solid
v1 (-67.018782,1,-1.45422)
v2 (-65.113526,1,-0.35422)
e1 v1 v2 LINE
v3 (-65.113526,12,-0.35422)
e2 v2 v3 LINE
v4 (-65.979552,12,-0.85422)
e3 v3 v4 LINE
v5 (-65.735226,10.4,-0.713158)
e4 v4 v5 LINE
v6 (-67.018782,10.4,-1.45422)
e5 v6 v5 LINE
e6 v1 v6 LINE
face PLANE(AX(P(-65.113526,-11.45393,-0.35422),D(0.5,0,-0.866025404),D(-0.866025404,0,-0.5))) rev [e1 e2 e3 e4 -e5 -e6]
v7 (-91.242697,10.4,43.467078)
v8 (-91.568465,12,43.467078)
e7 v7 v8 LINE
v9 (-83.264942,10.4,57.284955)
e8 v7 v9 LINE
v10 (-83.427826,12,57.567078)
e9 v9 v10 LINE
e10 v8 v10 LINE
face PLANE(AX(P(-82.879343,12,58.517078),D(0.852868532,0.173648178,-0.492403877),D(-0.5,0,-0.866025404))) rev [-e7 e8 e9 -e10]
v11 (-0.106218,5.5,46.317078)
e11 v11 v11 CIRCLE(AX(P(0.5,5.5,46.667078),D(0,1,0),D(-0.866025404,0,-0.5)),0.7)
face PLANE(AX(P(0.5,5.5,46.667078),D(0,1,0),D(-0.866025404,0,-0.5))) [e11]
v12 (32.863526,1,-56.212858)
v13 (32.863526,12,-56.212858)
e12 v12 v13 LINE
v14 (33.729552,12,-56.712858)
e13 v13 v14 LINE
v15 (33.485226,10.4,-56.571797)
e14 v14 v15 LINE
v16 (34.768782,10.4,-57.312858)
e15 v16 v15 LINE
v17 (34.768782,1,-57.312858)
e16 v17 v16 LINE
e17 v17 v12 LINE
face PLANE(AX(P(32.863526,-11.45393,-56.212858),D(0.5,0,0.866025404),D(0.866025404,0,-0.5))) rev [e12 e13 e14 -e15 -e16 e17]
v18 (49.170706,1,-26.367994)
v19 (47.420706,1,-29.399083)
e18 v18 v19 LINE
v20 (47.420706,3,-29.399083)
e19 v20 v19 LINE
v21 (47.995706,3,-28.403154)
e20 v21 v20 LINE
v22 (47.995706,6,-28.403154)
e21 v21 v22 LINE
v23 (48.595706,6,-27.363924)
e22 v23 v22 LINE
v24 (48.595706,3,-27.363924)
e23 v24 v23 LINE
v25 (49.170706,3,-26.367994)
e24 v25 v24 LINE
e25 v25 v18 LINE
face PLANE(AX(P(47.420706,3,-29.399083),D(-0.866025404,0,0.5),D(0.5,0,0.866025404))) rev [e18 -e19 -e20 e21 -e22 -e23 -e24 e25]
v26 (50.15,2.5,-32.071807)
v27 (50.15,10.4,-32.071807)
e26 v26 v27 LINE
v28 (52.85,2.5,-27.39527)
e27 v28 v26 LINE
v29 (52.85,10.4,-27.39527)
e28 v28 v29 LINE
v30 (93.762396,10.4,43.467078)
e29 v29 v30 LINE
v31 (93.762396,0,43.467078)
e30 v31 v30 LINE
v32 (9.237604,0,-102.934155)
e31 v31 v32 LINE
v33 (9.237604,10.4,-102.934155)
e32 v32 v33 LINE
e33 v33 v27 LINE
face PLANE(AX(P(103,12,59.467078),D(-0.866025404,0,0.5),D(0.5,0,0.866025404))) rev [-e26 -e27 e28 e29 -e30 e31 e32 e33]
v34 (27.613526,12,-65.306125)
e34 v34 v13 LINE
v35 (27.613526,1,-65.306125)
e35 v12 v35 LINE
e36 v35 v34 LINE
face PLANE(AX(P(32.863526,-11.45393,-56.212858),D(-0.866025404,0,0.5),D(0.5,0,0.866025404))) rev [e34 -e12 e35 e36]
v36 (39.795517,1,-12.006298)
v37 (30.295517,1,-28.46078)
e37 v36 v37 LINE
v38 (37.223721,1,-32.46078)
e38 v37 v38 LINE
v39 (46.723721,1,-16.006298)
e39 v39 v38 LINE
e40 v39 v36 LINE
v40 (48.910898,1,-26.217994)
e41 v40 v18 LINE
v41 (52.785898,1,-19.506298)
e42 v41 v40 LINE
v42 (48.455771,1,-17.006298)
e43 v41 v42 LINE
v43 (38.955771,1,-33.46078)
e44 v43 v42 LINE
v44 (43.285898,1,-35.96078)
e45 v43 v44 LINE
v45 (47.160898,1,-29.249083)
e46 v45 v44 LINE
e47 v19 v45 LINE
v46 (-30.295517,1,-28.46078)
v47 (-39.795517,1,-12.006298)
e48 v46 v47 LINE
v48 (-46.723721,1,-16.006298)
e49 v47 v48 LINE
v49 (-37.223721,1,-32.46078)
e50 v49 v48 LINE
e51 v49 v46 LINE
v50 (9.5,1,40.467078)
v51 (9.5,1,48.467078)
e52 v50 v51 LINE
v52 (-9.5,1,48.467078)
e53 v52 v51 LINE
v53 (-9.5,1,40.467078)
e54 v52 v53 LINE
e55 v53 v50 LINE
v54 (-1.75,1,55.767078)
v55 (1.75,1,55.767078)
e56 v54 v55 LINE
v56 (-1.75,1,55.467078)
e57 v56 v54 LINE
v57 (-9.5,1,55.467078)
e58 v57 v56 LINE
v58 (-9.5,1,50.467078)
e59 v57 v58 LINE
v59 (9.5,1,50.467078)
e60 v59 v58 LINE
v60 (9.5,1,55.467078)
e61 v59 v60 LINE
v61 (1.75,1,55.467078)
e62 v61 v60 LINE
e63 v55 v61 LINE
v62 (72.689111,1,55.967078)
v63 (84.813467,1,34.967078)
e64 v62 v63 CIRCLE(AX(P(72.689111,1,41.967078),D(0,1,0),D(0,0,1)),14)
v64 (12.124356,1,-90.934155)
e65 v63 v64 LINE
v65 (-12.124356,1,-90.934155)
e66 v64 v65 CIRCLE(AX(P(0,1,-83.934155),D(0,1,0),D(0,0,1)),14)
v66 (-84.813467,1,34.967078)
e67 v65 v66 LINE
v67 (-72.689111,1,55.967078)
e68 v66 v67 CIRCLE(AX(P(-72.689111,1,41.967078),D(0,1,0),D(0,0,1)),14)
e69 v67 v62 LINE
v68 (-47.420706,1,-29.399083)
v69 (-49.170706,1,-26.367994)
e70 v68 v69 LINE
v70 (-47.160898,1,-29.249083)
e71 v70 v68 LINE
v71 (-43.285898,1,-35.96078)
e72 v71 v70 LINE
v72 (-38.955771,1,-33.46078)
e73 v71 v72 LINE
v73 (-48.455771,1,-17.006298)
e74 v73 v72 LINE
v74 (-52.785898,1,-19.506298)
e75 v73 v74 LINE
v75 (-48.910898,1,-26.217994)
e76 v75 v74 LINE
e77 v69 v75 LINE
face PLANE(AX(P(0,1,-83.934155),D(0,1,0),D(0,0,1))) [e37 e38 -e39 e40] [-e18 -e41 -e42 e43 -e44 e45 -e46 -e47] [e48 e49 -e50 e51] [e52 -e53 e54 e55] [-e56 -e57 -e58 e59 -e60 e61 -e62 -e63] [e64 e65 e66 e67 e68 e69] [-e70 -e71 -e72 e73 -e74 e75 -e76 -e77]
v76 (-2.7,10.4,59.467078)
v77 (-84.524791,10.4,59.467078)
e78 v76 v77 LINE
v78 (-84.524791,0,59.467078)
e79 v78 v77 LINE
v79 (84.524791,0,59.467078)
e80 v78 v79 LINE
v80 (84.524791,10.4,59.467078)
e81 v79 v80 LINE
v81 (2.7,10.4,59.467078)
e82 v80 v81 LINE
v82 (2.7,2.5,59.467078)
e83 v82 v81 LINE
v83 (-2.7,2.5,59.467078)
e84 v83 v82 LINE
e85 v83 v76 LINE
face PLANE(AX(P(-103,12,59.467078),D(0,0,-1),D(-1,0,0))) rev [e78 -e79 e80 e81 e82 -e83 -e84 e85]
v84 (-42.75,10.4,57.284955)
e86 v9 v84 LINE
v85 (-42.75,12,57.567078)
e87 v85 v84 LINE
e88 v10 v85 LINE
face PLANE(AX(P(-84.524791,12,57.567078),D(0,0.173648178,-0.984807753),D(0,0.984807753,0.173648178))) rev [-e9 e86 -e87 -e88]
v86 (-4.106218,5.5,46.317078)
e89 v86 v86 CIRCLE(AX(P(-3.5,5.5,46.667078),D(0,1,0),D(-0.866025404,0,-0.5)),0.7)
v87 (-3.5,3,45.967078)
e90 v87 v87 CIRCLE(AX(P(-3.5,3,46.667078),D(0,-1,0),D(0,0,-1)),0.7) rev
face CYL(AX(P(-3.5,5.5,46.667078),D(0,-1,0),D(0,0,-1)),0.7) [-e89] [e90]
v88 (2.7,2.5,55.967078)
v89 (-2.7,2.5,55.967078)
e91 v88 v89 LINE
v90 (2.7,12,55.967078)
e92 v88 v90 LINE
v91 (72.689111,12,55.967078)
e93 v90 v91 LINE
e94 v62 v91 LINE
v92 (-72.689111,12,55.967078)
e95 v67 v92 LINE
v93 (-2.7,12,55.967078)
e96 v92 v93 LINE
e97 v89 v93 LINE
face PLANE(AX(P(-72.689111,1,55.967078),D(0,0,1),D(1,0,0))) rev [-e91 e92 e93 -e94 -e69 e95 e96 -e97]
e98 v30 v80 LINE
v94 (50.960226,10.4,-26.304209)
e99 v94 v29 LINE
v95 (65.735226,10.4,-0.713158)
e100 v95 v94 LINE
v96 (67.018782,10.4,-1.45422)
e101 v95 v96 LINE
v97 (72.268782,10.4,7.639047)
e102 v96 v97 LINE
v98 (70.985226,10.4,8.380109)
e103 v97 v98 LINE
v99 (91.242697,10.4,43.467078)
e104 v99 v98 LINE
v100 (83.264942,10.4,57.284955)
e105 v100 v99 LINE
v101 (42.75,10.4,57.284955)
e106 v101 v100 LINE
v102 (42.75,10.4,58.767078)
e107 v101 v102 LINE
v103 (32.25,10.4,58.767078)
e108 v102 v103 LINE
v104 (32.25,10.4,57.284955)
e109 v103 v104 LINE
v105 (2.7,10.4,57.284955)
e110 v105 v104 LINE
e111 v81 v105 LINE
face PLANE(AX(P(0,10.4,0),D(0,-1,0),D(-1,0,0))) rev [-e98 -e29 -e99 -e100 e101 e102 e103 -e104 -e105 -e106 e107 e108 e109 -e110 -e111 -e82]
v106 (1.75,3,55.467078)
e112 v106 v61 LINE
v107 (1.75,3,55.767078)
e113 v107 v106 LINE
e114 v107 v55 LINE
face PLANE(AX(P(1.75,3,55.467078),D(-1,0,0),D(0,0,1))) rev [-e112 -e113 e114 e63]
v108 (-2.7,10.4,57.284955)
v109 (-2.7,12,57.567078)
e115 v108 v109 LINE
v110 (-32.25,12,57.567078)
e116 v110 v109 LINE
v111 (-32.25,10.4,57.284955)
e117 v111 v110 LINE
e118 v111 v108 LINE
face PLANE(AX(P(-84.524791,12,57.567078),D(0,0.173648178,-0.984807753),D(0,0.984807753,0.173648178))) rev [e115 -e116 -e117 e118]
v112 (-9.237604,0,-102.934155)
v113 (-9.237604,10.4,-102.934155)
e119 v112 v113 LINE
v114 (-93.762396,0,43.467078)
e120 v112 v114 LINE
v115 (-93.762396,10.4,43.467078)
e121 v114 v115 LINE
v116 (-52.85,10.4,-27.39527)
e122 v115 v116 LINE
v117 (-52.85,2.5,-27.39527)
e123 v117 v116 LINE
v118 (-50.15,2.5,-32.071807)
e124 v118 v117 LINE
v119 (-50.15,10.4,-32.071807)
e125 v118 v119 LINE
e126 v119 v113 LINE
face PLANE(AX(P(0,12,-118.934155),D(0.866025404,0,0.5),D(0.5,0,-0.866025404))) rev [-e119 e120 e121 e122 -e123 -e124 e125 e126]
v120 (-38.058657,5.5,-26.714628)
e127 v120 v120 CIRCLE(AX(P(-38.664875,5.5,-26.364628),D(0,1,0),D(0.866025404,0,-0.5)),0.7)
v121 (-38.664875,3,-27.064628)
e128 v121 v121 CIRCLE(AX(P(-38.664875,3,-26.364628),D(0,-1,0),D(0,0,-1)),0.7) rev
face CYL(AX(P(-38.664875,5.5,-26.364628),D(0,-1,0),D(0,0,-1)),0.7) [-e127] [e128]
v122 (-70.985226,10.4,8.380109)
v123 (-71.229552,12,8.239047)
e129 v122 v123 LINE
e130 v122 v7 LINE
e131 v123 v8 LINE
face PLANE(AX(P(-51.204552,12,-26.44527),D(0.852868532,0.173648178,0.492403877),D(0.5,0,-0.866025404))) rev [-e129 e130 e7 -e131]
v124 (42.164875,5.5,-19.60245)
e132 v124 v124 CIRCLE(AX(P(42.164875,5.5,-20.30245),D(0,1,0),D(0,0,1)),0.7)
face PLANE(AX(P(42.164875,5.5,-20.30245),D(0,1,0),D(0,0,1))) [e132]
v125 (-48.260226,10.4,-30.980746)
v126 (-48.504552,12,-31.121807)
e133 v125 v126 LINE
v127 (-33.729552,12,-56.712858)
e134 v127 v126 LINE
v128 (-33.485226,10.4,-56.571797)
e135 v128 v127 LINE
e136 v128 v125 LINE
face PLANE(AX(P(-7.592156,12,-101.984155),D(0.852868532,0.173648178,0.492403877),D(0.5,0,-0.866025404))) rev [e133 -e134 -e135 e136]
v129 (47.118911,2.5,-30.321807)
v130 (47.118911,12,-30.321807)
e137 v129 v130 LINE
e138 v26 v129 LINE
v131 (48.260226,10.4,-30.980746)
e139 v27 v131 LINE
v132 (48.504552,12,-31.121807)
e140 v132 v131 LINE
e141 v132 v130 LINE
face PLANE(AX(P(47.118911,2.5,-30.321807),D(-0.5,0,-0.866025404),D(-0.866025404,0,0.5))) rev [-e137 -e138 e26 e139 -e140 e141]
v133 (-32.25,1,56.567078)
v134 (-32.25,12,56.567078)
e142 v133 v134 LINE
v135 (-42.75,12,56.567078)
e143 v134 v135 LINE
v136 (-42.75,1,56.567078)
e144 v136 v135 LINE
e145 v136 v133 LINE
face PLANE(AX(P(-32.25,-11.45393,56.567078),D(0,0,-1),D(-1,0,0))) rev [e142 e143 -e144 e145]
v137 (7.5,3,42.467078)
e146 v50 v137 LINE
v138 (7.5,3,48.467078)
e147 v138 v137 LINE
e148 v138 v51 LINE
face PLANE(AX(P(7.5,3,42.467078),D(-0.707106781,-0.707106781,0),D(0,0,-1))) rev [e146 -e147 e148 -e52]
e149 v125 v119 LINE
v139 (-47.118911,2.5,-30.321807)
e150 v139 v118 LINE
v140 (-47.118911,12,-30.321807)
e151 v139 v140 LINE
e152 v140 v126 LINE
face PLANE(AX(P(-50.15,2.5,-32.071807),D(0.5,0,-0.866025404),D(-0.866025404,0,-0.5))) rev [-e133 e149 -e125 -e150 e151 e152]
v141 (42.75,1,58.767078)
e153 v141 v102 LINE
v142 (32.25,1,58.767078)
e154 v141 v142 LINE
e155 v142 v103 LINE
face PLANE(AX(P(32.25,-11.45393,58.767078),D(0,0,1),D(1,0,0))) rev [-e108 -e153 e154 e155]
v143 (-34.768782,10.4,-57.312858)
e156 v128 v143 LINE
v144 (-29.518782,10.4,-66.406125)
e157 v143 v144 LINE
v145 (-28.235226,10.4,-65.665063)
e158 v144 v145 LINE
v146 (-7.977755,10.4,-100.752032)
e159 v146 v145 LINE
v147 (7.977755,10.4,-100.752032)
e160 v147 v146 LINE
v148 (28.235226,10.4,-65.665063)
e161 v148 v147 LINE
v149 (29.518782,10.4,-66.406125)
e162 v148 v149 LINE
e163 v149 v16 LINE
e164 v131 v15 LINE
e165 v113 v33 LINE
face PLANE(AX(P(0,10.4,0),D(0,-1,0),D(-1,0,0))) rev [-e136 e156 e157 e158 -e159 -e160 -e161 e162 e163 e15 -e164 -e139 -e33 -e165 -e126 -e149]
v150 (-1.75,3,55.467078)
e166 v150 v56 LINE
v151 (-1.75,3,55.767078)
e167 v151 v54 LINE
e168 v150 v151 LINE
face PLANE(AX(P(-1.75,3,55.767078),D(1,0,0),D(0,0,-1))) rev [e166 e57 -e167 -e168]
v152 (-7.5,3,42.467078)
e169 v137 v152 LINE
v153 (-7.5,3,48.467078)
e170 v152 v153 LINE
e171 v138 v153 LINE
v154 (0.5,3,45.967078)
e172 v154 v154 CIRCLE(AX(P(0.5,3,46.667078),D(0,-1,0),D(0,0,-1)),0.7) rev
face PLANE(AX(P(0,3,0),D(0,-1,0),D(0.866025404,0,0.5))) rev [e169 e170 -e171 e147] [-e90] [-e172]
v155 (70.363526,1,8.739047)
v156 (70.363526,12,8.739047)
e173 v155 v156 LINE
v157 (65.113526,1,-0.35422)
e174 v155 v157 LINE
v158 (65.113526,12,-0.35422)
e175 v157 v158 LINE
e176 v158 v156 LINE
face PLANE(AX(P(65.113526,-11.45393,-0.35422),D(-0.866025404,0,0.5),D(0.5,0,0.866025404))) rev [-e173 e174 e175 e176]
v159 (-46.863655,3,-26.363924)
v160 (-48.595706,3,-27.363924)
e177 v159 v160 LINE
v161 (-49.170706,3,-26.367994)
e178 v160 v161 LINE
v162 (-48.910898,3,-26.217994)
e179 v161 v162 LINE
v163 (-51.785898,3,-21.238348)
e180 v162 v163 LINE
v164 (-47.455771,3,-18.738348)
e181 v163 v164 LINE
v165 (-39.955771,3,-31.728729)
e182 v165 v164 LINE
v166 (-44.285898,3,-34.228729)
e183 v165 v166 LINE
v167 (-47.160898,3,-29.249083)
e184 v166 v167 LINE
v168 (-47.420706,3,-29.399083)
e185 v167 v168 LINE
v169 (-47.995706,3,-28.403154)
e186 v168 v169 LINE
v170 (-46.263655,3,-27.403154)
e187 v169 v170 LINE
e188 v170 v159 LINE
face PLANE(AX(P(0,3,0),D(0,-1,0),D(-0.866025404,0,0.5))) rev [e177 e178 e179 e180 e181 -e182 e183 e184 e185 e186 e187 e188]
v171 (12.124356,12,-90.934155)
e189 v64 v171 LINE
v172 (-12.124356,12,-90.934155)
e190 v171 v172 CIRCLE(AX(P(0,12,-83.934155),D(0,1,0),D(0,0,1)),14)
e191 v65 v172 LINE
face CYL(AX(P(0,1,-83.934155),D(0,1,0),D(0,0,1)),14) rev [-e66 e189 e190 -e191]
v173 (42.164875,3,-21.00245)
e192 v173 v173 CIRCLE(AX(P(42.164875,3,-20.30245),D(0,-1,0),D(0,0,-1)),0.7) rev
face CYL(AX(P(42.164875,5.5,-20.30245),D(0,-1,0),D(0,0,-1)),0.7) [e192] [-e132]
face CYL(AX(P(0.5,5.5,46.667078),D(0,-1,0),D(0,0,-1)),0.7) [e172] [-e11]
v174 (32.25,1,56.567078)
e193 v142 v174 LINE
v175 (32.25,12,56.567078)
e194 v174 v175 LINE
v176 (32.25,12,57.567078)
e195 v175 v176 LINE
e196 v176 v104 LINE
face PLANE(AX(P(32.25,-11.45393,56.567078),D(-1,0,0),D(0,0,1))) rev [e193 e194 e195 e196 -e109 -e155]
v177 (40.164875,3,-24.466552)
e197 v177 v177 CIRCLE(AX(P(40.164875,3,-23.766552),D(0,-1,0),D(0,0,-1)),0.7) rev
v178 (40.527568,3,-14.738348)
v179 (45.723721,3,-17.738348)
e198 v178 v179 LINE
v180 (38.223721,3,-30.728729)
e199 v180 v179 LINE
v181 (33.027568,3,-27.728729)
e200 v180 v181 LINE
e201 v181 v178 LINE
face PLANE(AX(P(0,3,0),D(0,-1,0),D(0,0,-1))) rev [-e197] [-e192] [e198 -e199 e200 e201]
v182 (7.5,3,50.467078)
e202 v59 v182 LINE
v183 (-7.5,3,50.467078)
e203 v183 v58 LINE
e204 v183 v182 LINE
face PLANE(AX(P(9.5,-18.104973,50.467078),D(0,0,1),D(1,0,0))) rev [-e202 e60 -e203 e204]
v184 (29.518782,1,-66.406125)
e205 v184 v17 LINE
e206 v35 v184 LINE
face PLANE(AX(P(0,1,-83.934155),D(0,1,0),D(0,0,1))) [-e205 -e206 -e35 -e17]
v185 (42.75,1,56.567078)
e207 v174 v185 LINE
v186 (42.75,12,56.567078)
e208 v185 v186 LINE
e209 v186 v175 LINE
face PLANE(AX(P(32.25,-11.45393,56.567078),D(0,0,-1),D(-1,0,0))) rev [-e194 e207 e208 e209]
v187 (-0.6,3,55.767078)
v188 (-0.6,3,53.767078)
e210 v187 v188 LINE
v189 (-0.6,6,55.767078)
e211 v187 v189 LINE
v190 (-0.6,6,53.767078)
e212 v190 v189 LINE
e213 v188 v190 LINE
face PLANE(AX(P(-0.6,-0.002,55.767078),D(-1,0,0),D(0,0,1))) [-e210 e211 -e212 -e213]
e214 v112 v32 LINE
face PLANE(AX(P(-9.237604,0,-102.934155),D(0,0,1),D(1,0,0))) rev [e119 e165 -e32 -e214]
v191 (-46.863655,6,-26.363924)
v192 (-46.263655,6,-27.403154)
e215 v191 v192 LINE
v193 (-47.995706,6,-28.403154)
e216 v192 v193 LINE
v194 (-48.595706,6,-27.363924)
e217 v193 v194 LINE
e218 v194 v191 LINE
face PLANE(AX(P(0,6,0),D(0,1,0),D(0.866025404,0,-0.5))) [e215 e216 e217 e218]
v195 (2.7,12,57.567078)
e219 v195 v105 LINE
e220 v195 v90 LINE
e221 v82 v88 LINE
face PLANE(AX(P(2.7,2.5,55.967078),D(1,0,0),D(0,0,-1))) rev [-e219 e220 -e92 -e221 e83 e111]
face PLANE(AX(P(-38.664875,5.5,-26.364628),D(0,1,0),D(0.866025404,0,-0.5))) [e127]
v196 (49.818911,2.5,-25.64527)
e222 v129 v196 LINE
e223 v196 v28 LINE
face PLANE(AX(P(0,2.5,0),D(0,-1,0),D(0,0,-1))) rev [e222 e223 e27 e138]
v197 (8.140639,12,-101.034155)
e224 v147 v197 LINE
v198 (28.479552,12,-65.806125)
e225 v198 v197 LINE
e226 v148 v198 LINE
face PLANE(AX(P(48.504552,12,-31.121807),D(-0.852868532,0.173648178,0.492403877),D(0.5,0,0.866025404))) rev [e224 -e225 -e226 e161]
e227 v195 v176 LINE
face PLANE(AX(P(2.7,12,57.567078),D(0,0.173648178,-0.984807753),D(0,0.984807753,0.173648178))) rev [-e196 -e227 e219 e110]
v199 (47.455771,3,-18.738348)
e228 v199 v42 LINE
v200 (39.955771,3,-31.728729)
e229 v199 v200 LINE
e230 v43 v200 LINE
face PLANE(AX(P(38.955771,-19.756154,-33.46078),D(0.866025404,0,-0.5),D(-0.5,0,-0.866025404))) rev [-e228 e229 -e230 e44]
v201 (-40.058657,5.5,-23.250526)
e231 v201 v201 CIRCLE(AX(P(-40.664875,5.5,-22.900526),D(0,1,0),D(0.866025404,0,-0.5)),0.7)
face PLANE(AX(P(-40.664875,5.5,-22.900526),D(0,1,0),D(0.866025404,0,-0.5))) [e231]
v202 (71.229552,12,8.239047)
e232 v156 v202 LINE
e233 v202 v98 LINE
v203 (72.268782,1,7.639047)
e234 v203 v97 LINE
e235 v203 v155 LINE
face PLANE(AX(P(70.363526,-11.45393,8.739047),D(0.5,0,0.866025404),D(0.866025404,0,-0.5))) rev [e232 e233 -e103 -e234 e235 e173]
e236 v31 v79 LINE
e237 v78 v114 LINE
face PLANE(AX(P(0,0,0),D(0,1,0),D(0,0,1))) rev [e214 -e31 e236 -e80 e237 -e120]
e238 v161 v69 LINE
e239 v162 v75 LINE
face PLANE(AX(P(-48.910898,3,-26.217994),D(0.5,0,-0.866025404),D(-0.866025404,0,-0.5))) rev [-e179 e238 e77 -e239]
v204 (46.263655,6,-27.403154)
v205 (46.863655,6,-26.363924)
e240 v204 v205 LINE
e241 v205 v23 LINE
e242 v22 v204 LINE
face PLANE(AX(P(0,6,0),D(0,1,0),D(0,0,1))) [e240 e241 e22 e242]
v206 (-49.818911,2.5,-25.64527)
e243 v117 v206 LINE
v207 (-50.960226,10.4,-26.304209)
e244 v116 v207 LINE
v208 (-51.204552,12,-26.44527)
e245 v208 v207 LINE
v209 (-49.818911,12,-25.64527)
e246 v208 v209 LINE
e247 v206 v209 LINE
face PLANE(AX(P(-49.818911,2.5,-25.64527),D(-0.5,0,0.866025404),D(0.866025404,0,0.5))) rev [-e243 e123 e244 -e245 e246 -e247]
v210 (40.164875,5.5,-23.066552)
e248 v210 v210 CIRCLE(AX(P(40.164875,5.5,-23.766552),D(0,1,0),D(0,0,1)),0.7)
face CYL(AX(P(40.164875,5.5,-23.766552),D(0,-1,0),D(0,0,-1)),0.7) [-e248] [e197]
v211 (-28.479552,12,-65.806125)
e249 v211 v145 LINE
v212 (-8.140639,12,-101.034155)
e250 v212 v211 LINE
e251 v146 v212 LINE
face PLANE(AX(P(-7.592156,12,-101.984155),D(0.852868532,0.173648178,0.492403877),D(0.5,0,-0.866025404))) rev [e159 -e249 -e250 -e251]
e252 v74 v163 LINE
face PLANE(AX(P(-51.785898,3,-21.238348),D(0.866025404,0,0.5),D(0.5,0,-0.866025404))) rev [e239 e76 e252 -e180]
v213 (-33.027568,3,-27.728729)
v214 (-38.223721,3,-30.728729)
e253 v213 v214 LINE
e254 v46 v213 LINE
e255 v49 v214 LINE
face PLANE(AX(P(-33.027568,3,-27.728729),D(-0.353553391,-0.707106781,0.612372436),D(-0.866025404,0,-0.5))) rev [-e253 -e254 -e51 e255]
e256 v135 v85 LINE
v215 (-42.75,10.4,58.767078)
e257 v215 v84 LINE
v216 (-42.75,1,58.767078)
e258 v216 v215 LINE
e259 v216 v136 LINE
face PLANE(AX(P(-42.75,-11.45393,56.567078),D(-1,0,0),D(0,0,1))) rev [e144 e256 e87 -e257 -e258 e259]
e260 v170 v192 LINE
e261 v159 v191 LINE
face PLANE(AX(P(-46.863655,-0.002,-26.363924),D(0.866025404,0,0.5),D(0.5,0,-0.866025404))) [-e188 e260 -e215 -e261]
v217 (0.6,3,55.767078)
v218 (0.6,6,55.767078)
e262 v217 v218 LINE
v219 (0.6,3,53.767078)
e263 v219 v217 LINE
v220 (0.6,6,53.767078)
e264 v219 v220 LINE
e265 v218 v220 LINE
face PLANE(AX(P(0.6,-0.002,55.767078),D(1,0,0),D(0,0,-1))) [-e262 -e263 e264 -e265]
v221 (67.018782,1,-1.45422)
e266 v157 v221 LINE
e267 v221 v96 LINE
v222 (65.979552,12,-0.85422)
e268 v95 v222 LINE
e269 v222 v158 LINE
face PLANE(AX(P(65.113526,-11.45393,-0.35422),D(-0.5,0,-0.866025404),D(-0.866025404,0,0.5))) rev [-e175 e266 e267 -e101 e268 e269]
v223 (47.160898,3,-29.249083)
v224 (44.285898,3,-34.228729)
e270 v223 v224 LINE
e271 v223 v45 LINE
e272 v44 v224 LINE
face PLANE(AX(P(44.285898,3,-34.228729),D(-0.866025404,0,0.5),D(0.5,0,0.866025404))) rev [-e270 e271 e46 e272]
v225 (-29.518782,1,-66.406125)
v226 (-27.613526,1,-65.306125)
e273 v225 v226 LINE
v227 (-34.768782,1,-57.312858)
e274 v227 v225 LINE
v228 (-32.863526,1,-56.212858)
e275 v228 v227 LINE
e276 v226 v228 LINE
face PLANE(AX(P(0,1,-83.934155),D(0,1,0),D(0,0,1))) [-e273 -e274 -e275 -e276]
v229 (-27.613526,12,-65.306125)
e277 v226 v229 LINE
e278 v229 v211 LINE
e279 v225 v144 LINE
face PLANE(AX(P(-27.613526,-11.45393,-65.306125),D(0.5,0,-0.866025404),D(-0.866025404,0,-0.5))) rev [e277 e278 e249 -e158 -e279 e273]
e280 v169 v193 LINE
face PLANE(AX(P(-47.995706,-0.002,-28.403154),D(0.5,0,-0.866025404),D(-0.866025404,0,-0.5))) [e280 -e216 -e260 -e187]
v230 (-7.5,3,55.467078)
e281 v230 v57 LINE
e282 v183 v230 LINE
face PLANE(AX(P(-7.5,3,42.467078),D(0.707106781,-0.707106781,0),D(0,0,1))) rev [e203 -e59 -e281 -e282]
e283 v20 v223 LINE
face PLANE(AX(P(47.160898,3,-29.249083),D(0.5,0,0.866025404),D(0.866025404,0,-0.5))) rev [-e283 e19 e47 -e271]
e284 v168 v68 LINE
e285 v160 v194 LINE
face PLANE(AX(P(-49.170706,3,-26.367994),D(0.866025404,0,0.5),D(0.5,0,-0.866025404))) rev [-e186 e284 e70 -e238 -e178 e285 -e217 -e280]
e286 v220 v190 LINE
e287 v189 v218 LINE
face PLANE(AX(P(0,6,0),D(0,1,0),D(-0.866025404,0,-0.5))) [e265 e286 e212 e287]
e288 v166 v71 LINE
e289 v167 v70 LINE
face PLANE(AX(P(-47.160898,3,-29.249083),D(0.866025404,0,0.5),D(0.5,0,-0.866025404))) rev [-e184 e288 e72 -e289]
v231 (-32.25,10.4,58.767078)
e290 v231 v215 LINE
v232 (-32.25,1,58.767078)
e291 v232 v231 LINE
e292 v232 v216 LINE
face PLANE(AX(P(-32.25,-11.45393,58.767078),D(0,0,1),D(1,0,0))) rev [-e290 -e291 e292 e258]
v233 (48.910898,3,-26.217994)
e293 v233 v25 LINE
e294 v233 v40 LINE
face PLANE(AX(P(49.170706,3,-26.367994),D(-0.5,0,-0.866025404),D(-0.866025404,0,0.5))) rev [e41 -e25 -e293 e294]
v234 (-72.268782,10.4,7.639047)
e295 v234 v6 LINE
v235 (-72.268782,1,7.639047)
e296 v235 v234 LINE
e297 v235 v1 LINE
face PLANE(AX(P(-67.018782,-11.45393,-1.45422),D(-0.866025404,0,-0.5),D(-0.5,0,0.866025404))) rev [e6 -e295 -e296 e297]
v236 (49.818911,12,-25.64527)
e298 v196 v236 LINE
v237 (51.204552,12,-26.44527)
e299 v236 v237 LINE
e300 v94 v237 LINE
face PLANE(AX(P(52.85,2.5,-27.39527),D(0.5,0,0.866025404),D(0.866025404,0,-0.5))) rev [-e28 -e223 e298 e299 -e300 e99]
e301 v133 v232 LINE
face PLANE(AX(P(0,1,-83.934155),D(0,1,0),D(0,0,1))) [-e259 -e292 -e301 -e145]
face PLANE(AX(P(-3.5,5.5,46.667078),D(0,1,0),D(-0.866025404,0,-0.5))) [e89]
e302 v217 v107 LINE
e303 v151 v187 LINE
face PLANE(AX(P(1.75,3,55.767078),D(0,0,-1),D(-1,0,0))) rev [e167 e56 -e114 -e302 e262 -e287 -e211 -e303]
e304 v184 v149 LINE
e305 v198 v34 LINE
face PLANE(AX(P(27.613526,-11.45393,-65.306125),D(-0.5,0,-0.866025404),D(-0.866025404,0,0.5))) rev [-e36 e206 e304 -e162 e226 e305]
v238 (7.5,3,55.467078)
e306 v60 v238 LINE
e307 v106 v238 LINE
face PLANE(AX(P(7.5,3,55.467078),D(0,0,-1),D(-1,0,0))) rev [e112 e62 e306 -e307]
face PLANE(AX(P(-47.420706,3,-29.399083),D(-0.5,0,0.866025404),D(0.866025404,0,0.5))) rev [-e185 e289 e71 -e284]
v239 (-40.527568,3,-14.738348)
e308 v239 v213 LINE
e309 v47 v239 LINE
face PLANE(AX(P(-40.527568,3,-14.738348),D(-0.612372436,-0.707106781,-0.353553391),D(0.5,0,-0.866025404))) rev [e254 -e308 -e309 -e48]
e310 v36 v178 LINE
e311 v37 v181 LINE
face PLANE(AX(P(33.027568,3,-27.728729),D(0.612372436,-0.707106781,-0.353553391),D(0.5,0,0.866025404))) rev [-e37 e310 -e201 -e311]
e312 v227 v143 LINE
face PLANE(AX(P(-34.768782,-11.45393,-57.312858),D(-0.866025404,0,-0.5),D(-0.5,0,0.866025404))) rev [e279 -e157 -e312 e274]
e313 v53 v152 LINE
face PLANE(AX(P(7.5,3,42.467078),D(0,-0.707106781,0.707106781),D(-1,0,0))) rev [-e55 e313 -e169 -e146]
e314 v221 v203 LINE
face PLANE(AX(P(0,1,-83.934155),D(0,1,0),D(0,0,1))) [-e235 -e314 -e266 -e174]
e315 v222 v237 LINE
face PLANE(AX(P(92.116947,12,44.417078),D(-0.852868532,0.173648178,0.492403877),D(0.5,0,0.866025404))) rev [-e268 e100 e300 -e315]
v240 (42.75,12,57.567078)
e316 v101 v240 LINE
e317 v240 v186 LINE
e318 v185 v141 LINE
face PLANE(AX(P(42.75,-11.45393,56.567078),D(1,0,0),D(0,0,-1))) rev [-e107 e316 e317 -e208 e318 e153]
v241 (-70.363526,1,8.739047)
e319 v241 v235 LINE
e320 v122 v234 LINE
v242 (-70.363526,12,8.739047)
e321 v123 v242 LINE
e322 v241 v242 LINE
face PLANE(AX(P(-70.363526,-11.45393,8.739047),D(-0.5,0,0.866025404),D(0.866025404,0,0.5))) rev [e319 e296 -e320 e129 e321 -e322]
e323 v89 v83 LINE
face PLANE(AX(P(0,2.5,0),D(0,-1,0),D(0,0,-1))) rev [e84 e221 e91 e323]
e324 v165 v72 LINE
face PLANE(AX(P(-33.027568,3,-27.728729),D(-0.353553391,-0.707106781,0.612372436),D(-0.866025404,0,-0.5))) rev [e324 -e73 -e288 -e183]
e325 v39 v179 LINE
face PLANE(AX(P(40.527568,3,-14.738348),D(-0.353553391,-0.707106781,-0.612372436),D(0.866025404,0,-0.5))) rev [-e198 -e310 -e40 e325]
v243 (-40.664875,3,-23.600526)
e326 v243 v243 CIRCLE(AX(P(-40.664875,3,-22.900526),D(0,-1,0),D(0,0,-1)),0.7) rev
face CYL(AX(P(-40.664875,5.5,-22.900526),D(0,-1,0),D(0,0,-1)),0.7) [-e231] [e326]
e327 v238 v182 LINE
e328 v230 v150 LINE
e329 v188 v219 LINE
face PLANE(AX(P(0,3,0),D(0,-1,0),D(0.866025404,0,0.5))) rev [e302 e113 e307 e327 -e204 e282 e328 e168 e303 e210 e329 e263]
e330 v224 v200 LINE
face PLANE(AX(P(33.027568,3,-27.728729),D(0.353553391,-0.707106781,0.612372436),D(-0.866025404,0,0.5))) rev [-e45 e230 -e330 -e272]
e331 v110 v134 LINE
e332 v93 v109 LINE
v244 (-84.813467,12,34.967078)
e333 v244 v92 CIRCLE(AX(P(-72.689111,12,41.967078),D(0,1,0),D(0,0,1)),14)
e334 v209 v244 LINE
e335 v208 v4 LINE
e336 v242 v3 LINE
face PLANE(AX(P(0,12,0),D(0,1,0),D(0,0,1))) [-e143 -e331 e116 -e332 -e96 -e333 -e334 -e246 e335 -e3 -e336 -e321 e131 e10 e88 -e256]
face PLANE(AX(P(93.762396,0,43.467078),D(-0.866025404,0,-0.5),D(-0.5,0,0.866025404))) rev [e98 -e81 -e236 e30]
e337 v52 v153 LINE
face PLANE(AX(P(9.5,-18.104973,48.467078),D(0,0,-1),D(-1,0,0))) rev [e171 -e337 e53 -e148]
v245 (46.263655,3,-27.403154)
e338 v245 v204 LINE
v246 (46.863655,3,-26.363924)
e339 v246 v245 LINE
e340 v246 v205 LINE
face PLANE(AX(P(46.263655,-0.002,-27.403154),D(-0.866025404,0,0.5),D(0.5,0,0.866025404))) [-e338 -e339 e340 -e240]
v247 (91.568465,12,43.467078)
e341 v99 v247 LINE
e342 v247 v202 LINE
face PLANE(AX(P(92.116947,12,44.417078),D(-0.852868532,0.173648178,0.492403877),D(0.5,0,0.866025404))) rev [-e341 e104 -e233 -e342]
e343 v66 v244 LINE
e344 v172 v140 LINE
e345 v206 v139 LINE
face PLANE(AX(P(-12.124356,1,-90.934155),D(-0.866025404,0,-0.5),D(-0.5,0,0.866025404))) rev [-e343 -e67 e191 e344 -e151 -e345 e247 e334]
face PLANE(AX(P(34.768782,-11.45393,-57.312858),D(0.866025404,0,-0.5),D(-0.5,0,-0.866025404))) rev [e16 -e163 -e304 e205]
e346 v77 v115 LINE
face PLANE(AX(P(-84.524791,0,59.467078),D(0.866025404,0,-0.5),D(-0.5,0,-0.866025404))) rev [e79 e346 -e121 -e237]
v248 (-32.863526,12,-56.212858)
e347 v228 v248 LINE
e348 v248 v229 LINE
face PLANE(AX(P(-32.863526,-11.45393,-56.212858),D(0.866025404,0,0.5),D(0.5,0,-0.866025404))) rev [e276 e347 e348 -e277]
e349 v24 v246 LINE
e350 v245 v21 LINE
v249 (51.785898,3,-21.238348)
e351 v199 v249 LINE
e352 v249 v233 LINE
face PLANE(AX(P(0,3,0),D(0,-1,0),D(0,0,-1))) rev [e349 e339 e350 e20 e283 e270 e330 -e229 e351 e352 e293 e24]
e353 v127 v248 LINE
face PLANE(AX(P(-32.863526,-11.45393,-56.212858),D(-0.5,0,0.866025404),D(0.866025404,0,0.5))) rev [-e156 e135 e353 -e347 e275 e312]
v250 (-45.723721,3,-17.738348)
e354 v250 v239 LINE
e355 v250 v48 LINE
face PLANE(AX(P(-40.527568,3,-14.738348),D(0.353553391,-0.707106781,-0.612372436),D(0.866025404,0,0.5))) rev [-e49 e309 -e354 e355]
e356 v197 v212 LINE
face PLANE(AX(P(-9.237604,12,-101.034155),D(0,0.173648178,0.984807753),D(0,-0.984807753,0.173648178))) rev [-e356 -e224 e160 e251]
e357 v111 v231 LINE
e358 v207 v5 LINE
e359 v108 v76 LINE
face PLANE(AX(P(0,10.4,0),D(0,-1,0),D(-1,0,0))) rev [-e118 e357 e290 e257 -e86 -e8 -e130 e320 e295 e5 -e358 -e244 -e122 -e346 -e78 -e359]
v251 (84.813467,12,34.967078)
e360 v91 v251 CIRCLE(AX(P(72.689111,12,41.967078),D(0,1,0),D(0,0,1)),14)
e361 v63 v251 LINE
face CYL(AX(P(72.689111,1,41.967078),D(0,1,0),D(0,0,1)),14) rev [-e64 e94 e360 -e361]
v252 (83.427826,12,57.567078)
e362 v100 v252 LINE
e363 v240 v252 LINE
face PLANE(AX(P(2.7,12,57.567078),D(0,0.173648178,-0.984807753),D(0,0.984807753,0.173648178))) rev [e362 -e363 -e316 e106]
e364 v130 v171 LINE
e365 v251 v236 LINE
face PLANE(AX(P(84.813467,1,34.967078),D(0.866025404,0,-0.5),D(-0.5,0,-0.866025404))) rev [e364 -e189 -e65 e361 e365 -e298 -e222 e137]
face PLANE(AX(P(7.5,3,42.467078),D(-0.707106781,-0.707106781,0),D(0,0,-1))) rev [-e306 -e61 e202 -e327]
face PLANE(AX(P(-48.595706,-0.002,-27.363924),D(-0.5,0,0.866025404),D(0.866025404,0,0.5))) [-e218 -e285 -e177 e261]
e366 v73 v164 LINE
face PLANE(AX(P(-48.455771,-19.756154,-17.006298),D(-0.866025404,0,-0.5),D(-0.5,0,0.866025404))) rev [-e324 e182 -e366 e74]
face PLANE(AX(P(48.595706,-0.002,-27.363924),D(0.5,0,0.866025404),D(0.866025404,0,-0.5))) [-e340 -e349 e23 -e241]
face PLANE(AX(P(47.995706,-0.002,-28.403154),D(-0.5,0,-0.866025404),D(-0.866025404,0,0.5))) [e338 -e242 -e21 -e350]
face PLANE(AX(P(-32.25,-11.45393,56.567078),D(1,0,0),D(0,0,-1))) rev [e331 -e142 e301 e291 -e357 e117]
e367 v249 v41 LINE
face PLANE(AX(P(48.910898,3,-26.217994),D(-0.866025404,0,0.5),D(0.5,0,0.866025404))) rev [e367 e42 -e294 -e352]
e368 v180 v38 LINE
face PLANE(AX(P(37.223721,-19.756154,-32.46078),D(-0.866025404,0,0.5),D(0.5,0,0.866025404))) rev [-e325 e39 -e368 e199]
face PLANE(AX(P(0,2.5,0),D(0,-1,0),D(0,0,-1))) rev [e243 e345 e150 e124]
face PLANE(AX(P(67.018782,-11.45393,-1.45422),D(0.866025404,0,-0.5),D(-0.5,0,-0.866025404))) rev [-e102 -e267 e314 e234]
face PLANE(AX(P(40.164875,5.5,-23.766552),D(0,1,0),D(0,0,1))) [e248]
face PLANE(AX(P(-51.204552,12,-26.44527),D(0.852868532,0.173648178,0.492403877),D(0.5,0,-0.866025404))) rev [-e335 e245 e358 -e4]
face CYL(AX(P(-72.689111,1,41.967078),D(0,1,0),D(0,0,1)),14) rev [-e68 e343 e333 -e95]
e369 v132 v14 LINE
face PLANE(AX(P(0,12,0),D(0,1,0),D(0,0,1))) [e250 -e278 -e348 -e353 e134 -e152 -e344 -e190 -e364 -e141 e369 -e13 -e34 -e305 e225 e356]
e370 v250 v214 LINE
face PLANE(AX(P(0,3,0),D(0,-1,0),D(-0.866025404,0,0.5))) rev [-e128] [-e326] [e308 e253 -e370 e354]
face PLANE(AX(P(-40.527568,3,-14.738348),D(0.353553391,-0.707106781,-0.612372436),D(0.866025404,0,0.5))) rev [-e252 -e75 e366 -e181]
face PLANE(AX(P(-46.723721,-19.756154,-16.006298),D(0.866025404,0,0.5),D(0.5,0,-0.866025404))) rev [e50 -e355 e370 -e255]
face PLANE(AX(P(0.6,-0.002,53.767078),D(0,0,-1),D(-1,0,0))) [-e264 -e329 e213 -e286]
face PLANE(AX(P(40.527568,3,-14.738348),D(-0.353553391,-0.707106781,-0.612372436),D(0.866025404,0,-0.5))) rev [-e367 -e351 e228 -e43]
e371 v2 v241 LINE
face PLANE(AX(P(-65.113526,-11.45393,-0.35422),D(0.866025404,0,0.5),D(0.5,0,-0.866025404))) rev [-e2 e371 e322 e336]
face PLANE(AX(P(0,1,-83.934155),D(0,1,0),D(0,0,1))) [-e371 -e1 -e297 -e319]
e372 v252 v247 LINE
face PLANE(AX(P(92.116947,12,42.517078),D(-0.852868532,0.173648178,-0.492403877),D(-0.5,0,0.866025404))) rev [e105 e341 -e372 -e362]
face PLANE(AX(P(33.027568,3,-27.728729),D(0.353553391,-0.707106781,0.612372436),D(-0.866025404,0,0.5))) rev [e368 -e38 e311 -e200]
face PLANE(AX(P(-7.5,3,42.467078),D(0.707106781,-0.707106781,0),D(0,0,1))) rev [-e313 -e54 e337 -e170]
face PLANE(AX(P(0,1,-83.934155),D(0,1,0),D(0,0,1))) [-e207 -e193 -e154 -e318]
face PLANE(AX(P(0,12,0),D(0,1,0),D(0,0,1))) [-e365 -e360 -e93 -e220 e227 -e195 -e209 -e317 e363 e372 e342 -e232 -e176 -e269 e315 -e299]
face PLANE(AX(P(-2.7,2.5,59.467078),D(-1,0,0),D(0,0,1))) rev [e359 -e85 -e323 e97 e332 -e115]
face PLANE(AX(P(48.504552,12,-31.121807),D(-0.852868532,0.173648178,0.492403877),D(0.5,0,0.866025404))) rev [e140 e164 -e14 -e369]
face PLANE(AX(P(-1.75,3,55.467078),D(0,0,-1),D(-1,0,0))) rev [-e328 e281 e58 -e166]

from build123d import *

# Parameters (mm, degrees)
BOSS_EXTRU_1_DEPTH                        = 12
ENL_V_MAT_EXTRU_1_DEPTH                   = 158.792057257
ENL_V_MAT_EXTRU_2_DEPTH                   = 11
ESQUISSE4_W                               = 5.4
ESQUISSE4_H                               = 3.5
ENL_V_MAT_EXTRU_3_DEPTH                   = 9.5
BOSS_EXTRU_2_DEPTH                        = 2
ESQUISSE13_R                              = 0.7
BOSS_EXTRU_3_DEPTH                        = 2.5
BOSS_EXTRU_8_DEPTH                        = 3
CHANFREIN4_SIZE                           = 2
ENL_V_MAT_EXTRU_11_DEPTH                  = 2
R_P_TITION_START                          = 1
R_P_TITION_CIRCULAIRE1_OUTLINE_W          = 1.2
R_P_TITION_CIRCULAIRE1_OUTLINE_H          = 2
R_P_TITION_CIRCULAIRE1_OUTLINE_R          = 0.7
R_P_TITION_CIRCULAIRE1_DEPTH              = 4.5
R_P_TITION_START_2                        = 5.5
R_P_TITION_CIRCULAIRE1_2_OUTLINE_W        = 1.2
R_P_TITION_CIRCULAIRE1_2_OUTLINE_H        = 2
R_P_TITION_CIRCULAIRE1_2_DEPTH            = 0.5
ENL_V_DE_MAT_EXTRU_MINCE1_DEPTH           = 1.6
ENL_V_DE_MAT_EXTRU_MINCE1_DRAFT           = 10
ENL_V_DE_MAT_EXTRU_MINCE1_PROFILE_2_DEPTH = 1.6
ENL_V_DE_MAT_EXTRU_MINCE1_PROFILE_2_DRAFT = 10
ENL_V_DE_MAT_EXTRU_MINCE1_PROFILE_3_DEPTH = 1.6
ENL_V_DE_MAT_EXTRU_MINCE1_PROFILE_3_DRAFT = 10
ESQUISSE18_W                              = 10.5
ESQUISSE18_H                              = 2.2
ENL_V_MAT_EXTRU_10_DEPTH                  = 11


with BuildPart() as part:
    # Esquisse1 → Boss.-Extru.1 (new body)
    with BuildSketch(Plane(origin=(0, 0, 0), x_dir=(1, 0, 0), z_dir=(0, 1, 0))):
        Polygon((-103, -59.467077727), (103, -59.467077727), (0, 118.934155453), align=None)
    extrude(amount=BOSS_EXTRU_1_DEPTH)

    # Esquisse2 → Enlèv. mat.-Extru.1 (cut, through all)
    with BuildSketch(Plane(origin=(0, 12, 0), x_dir=(1, 0, 0), z_dir=(0, 1, 0))):
        Polygon((-9.237604307, 102.934155453), (9.237604307, 102.934155453), (0, 118.934155453), align=None)
        Polygon((103, -59.467077727), (93.762395693, -43.467077727), (84.524791386, -59.467077727), align=None)
        Polygon((-103, -59.467077727), (-84.524791386, -59.467077727), (-93.762395693, -43.467077727), align=None)
    extrude(amount=-ENL_V_MAT_EXTRU_1_DEPTH, mode=Mode.SUBTRACT)

    # Esquisse3 → Enlèv. mat.-Extru.2 (cut)
    with BuildSketch(Plane(origin=(0, 12, 0), x_dir=(1, 0, 0), z_dir=(0, 1, 0))):
        with BuildLine():
            Line((84.813466521, -34.967077727), (12.124355653, 90.934155453))
            ThreePointArc((12.124355653, 90.934155453), (0, 97.934155453), (-12.124355653, 90.934155453))
            Line((-12.124355653, 90.934155453), (-84.813466521, -34.967077727))
            ThreePointArc((-84.813466521, -34.967077727), (-84.813466521, -48.967077727), (-72.689110868, -55.967077727))
            Line((-72.689110868, -55.967077727), (72.689110868, -55.967077727))
            ThreePointArc((72.689110868, -55.967077727), (84.813466521, -48.967077727), (84.813466521, -34.967077727))
        make_face()
    extrude(amount=-ENL_V_MAT_EXTRU_2_DEPTH, mode=Mode.SUBTRACT)

    # Esquisse4 → Enlèv. mat.-Extru.3 (cut)
    with BuildSketch(Plane(origin=(0, 12, 0), x_dir=(1, 0, 0), z_dir=(0, 1, 0))):
        Polygon((49.818911087, 25.645270273), (47.118911087, 30.321807453), (50.15, 32.071807453), (52.85, 27.395270273), align=None)
        with Locations((0, -57.717077727)):
            Rectangle(ESQUISSE4_W, ESQUISSE4_H)
        Polygon((-50.15, 32.071807453), (-47.118911087, 30.321807453), (-49.818911087, 25.645270273), (-52.85, 27.395270273), align=None)
    extrude(amount=-ENL_V_MAT_EXTRU_3_DEPTH, mode=Mode.SUBTRACT)

    # Esquisse12 → Boss.-Extru.2 (add)
    with BuildSketch(Plane(origin=(0, 1, 0), x_dir=(1, 0, 0), z_dir=(0, 1, 0))):
        Polygon((33.027568136, 27.728729392), (40.527568136, 14.738348335), (51.785898385, 21.238348335), (48.910898385, 26.217994407), (49.170706006, 26.367994407), (47.420706006, 29.39908332), (47.160898385, 29.24908332), (44.285898385, 34.228729392), align=None)
    extrude(amount=BOSS_EXTRU_2_DEPTH)

    # Esquisse13 → Boss.-Extru.3 (add)
    with BuildSketch(Plane(origin=(0, 3, 0), x_dir=(1, 0, 0), z_dir=(0, 1, 0))):
        with Locations(Location((40.164874832, 23.766551565, 0), (0, 0, 90))):
            Circle(ESQUISSE13_R)
        with Locations(Location((42.164874832, 20.30244995, 0), (0, 0, 90))):
            Circle(ESQUISSE13_R)
    extrude(amount=BOSS_EXTRU_3_DEPTH)

    # Esquisse20 → Boss.-Extru.8 (add, symmetric)
    with BuildSketch(Plane(origin=(0, 3, 0), x_dir=(1, 0, 0), z_dir=(0, 1, 0))):
        Polygon((47.995706006, 28.403154106), (48.595706006, 27.363923621), (46.863655198, 26.363923621), (46.263655198, 27.403154106), align=None)
    extrude(amount=BOSS_EXTRU_8_DEPTH, both=True)

    # Chanfrein4
    chanfrein4_edges = [part.edges().sort_by_distance(p)[0] for p in [
        (38.65673326, 1, -30.978729392),
        (36.777568136, 1, -21.233538863),
        (46.15673326, 1, -17.988348335),
    ]]
    chamfer(chanfrein4_edges, length=CHANFREIN4_SIZE - 0.0001)  # a hair under: the kernel refuses the full size

    # Esquisse21 → Enlèv. mat.-Extru.11 (cut)
    with BuildSketch(Plane(origin=(0, 3, 0), x_dir=(1, 0, 0), z_dir=(0, 1, 0))):
        Polygon((37.223720558, 32.460780199), (38.955771366, 33.460780199), (48.455771366, 17.006297527), (46.723720558, 16.006297527), align=None)
    extrude(amount=-ENL_V_MAT_EXTRU_11_DEPTH, mode=Mode.SUBTRACT)

    # Répétition circulaire1: read off the stored shape, not the designer's step
    # Répétition circulaire1 outline → Répétition circulaire1 (add)
    with BuildSketch(Plane(origin=(0, 0, 0), x_dir=(1, 0, 0), z_dir=(0, 1, 0)).offset(R_P_TITION_START)):
        Polygon((-47.995706006, 28.403154106), (-48.595706006, 27.363923621), (-46.863655198, 26.363923621), (-46.263655198, 27.403154106), align=None)
        with Locations((0, -54.767077727)):
            Rectangle(R_P_TITION_CIRCULAIRE1_OUTLINE_W, R_P_TITION_CIRCULAIRE1_OUTLINE_H)
        with Locations((-40.664874832, 22.900526161)):
            Circle(R_P_TITION_CIRCULAIRE1_OUTLINE_R)
        with Locations((-38.664874832, 26.364627777)):
            Circle(R_P_TITION_CIRCULAIRE1_OUTLINE_R)
        with Locations((0.5, -46.667077727)):
            Circle(R_P_TITION_CIRCULAIRE1_OUTLINE_R)
        with Locations((-3.5, -46.667077727)):
            Circle(R_P_TITION_CIRCULAIRE1_OUTLINE_R)
    extrude(amount=R_P_TITION_CIRCULAIRE1_DEPTH)

    # R_p_tition circulaire1 2 outline → R_p_tition circulaire1 2 (add)
    with BuildSketch(Plane(origin=(0, 0, 0), x_dir=(1, 0, 0), z_dir=(0, 1, 0)).offset(R_P_TITION_START_2)):
        Polygon((-47.995706006, 28.403154106), (-48.595706006, 27.363923621), (-46.863655198, 26.363923621), (-46.263655198, 27.403154106), align=None)
        with Locations((0, -54.767077727)):
            Rectangle(R_P_TITION_CIRCULAIRE1_2_OUTLINE_W, R_P_TITION_CIRCULAIRE1_2_OUTLINE_H)
    extrude(amount=R_P_TITION_CIRCULAIRE1_2_DEPTH)

    # R_p_tition circulaire1 3: loft between two sections, ruled curve by curve
    r_p_tition_circulaire1_3_from = [
        Edge.make_line((-38.223720558, 3, -30.728729392), (-33.027568136, 3, -27.728729392)),
        Edge.make_line((-45.723720558, 3, -17.738348335), (-40.527568136, 3, -14.738348335)),
        Edge.make_line((-33.027568136, 3, -27.728729392), (-40.527568136, 3, -14.738348335)),
        Edge.make_line((-45.723720558, 3, -17.738348335), (-38.223720558, 3, -30.728729392)),
    ]
    r_p_tition_circulaire1_3_to = [
        Edge.make_line((-37.223720558, 1, -32.460780199), (-30.295517328, 1, -28.460780199)),
        Edge.make_line((-46.723720558, 1, -16.006297527), (-39.795517328, 1, -12.006297527)),
        Edge.make_line((-30.295517328, 1, -28.460780199), (-39.795517328, 1, -12.006297527)),
        Edge.make_line((-46.723720558, 1, -16.006297527), (-37.223720558, 1, -32.460780199)),
    ]
    r_p_tition_circulaire1_3 = Solid(Shell([*[Face.make_surface_from_curves(r_p_tition_circulaire1_3_from[k], r_p_tition_circulaire1_3_to[k]) for k in range(4)], Face(Wire(r_p_tition_circulaire1_3_from)), Face(Wire(r_p_tition_circulaire1_3_to))]))
    add(r_p_tition_circulaire1_3)

    # R_p_tition circulaire1 4: loft between two sections, ruled curve by curve
    r_p_tition_circulaire1_4_from = [
        Edge.make_line((-7.5, 3, 48.467077727), (-7.5, 3, 42.467077727)),
        Edge.make_line((7.5, 3, 48.467077727), (7.5, 3, 42.467077727)),
        Edge.make_line((-7.5, 3, 42.467077727), (7.5, 3, 42.467077727)),
        Edge.make_line((7.5, 3, 48.467077727), (-7.5, 3, 48.467077727)),
    ]
    r_p_tition_circulaire1_4_to = [
        Edge.make_line((-9.5, 1, 48.467077727), (-9.5, 1, 40.467077727)),
        Edge.make_line((9.5, 1, 48.467077727), (9.5, 1, 40.467077727)),
        Edge.make_line((-9.5, 1, 40.467077727), (9.5, 1, 40.467077727)),
        Edge.make_line((9.5, 1, 48.467077727), (-9.5, 1, 48.467077727)),
    ]
    r_p_tition_circulaire1_4 = Solid(Shell([*[Face.make_surface_from_curves(r_p_tition_circulaire1_4_from[k], r_p_tition_circulaire1_4_to[k]) for k in range(4)], Face(Wire(r_p_tition_circulaire1_4_from)), Face(Wire(r_p_tition_circulaire1_4_to))]))
    add(r_p_tition_circulaire1_4)

    # R_p_tition circulaire1 5: loft between two sections, ruled curve by curve
    r_p_tition_circulaire1_5_from = [
        Edge.make_line((-39.955771366, 3, -31.728729392), (-44.285898385, 3, -34.228729392)),
        Edge.make_line((-47.455771366, 3, -18.738348335), (-51.785898385, 3, -21.238348335)),
        Edge.make_line((-47.160898385, 3, -29.24908332), (-44.285898385, 3, -34.228729392)),
        Edge.make_line((-51.785898385, 3, -21.238348335), (-48.910898385, 3, -26.217994407)),
        Edge.make_line((-47.420706006, 3, -29.39908332), (-47.160898385, 3, -29.24908332)),
        Edge.make_line((-48.910898385, 3, -26.217994407), (-49.170706006, 3, -26.367994407)),
        Edge.make_line((-39.955771366, 3, -31.728729392), (-47.455771366, 3, -18.738348335)),
        Edge.make_line((-49.170706006, 3, -26.367994407), (-47.420706006, 3, -29.39908332)),
    ]
    r_p_tition_circulaire1_5_to = [
        Edge.make_line((-38.955771366, 1, -33.460780199), (-43.285898385, 1, -35.960780199)),
        Edge.make_line((-48.455771366, 1, -17.006297527), (-52.785898385, 1, -19.506297527)),
        Edge.make_line((-47.160898385, 1, -29.24908332), (-43.285898385, 1, -35.960780199)),
        Edge.make_line((-52.785898385, 1, -19.506297527), (-48.910898385, 1, -26.217994407)),
        Edge.make_line((-47.420706006, 1, -29.39908332), (-47.160898385, 1, -29.24908332)),
        Edge.make_line((-48.910898385, 1, -26.217994407), (-49.170706006, 1, -26.367994407)),
        Edge.make_line((-38.955771366, 1, -33.460780199), (-48.455771366, 1, -17.006297527)),
        Edge.make_line((-49.170706006, 1, -26.367994407), (-47.420706006, 1, -29.39908332)),
    ]
    r_p_tition_circulaire1_5 = Solid(Shell([*[Face.make_surface_from_curves(r_p_tition_circulaire1_5_from[k], r_p_tition_circulaire1_5_to[k]) for k in range(8)], Face(Wire(r_p_tition_circulaire1_5_from)), Face(Wire(r_p_tition_circulaire1_5_to))]))
    add(r_p_tition_circulaire1_5)

    # R_p_tition circulaire1 6: loft between two sections, ruled curve by curve
    r_p_tition_circulaire1_6_from = [
        Edge.make_line((-7.5, 3, 50.467077727), (-7.5, 3, 55.467077727)),
        Edge.make_line((7.5, 3, 50.467077727), (7.5, 3, 55.467077727)),
        Edge.make_line((-1.75, 3, 55.467077727), (-7.5, 3, 55.467077727)),
        Edge.make_line((7.5, 3, 55.467077727), (1.75, 3, 55.467077727)),
        Edge.make_line((-1.75, 3, 55.767077727), (-1.75, 3, 55.467077727)),
        Edge.make_line((1.75, 3, 55.467077727), (1.75, 3, 55.767077727)),
        Edge.make_line((-7.5, 3, 50.467077727), (7.5, 3, 50.467077727)),
        Edge.make_line((1.75, 3, 55.767077727), (-1.75, 3, 55.767077727)),
    ]
    r_p_tition_circulaire1_6_to = [
        Edge.make_line((-9.5, 1, 50.467077727), (-9.5, 1, 55.467077727)),
        Edge.make_line((9.5, 1, 50.467077727), (9.5, 1, 55.467077727)),
        Edge.make_line((-1.75, 1, 55.467077727), (-9.5, 1, 55.467077727)),
        Edge.make_line((9.5, 1, 55.467077727), (1.75, 1, 55.467077727)),
        Edge.make_line((-1.75, 1, 55.767077727), (-1.75, 1, 55.467077727)),
        Edge.make_line((1.75, 1, 55.467077727), (1.75, 1, 55.767077727)),
        Edge.make_line((-9.5, 1, 50.467077727), (9.5, 1, 50.467077727)),
        Edge.make_line((1.75, 1, 55.767077727), (-1.75, 1, 55.767077727)),
    ]
    r_p_tition_circulaire1_6 = Solid(Shell([*[Face.make_surface_from_curves(r_p_tition_circulaire1_6_from[k], r_p_tition_circulaire1_6_to[k]) for k in range(8)], Face(Wire(r_p_tition_circulaire1_6_from)), Face(Wire(r_p_tition_circulaire1_6_to))]))
    add(r_p_tition_circulaire1_6)


with BuildPart() as enl_v_de_mat_extru_mince1_tool:
    # Esquisse17 → Enlèv. de mat.-Extru.-Mince1 (with draft: the straight prism first)
    with BuildSketch(Plane(origin=(0, 12, 0), x_dir=(1, 0, 0), z_dir=(0, 1, 0))):
        Polygon((50.15, 32.071807453), (9.237604307, 102.934155453), (-9.237604307, 102.934155453), (-50.15, 32.071807453), (-48.504551733, 31.121807453), (-8.140638796, 101.034155453), (8.140638796, 101.034155453), (48.504551733, 31.121807453), align=None)
    extrude(amount=-ENL_V_DE_MAT_EXTRU_MINCE1_DEPTH)
    # Enlèv. de mat.-Extru.-Mince1: the draft: its side faces are tilted about the plane it starts from
    enl_v_de_mat_extru_mince1_sides = [enl_v_de_mat_extru_mince1_tool.faces().sort_by_distance(p)[0] for p in [
        (29.693802154, 11.2, -67.502981453),
        (0, 11.2, -102.934155453),
        (-29.693802154, 11.2, -67.502981453),
        (-49.327275866, 11.2, -31.596807453),
        (-28.322595264, 11.2, -66.077981453),
        (0, 11.2, -101.034155453),
        (28.322595264, 11.2, -66.077981453),
        (49.327275866, 11.2, -31.596807453),
    ]]
    draft(enl_v_de_mat_extru_mince1_sides, Plane(origin=(0, 12, 0), x_dir=(1, 0, 0), z_dir=(0, 1, 0)), ENL_V_DE_MAT_EXTRU_MINCE1_DRAFT)


with BuildPart() as part_1:
    add(part.part)

    # Enlèv. de mat.-Extru.-Mince1: cut by enl_v_de_mat_extru_mince1_tool
    add(enl_v_de_mat_extru_mince1_tool.part, mode=Mode.SUBTRACT)


with BuildPart() as enl_v_de_mat_extru_mince1_profile_2_tool:
    # Esquisse17 → Enlèv. de mat.-Extru.-Mince1 profile 2 (with draft: the straight prism first)
    with BuildSketch(Plane(origin=(0, 12, 0), x_dir=(1, 0, 0), z_dir=(0, 1, 0))):
        Polygon((-52.85, 27.395270273), (-93.762395693, -43.467077727), (-84.524791386, -59.467077727), (-2.7, -59.467077727), (-2.7, -57.567077727), (-83.427825874, -57.567077727), (-91.56846467, -43.467077727), (-51.204551733, 26.445270273), align=None)
    extrude(amount=-ENL_V_DE_MAT_EXTRU_MINCE1_PROFILE_2_DEPTH)
    # Enlèv. de mat.-Extru.-Mince1 profile 2: the draft: its side faces are tilted about the plane it starts from
    enl_v_de_mat_extru_mince1_profile_2_sides = [enl_v_de_mat_extru_mince1_profile_2_tool.faces().sort_by_distance(p)[0] for p in [
        (-73.306197846, 11.2, 8.035903727),
        (-89.143593539, 11.2, 51.467077727),
        (-43.612395693, 11.2, 59.467077727),
        (-2.7, 11.2, 58.517077727),
        (-43.063912937, 11.2, 57.567077727),
        (-87.498145272, 11.2, 50.517077727),
        (-71.386508201, 11.2, 8.510903727),
        (-52.027275866, 11.2, -26.920270273),
    ]]
    draft(enl_v_de_mat_extru_mince1_profile_2_sides, Plane(origin=(0, 12, 0), x_dir=(1, 0, 0), z_dir=(0, 1, 0)), ENL_V_DE_MAT_EXTRU_MINCE1_PROFILE_2_DRAFT)


with BuildPart() as part_2:
    add(part_1.part)

    # Enlèv. de mat.-Extru.-Mince1 profile 2: cut by enl_v_de_mat_extru_mince1_profile_2_tool
    add(enl_v_de_mat_extru_mince1_profile_2_tool.part, mode=Mode.SUBTRACT)


with BuildPart() as enl_v_de_mat_extru_mince1_profile_3_tool:
    # Esquisse17 → Enlèv. de mat.-Extru.-Mince1 profile 3 (with draft: the straight prism first)
    with BuildSketch(Plane(origin=(0, 12, 0), x_dir=(1, 0, 0), z_dir=(0, 1, 0))):
        Polygon((2.7, -59.467077727), (84.524791386, -59.467077727), (93.762395693, -43.467077727), (52.85, 27.395270273), (51.204551733, 26.445270273), (91.56846467, -43.467077727), (83.427825874, -57.567077727), (2.7, -57.567077727), align=None)
    extrude(amount=-ENL_V_DE_MAT_EXTRU_MINCE1_PROFILE_3_DEPTH)
    # Enlèv. de mat.-Extru.-Mince1 profile 3: the draft: its side faces are tilted about the plane it starts from
    enl_v_de_mat_extru_mince1_profile_3_sides = [enl_v_de_mat_extru_mince1_profile_3_tool.faces().sort_by_distance(p)[0] for p in [
        (43.612395693, 11.2, 59.467077727),
        (89.143593539, 11.2, 51.467077727),
        (73.306197846, 11.2, 8.035903727),
        (52.027275866, 11.2, -26.920270273),
        (71.386508201, 11.2, 8.510903727),
        (87.498145272, 11.2, 50.517077727),
        (43.063912937, 11.2, 57.567077727),
        (2.7, 11.2, 58.517077727),
    ]]
    draft(enl_v_de_mat_extru_mince1_profile_3_sides, Plane(origin=(0, 12, 0), x_dir=(1, 0, 0), z_dir=(0, 1, 0)), ENL_V_DE_MAT_EXTRU_MINCE1_PROFILE_3_DRAFT)


with BuildPart() as part_3:
    add(part_2.part)

    # Enlèv. de mat.-Extru.-Mince1 profile 3: cut by enl_v_de_mat_extru_mince1_profile_3_tool
    add(enl_v_de_mat_extru_mince1_profile_3_tool.part, mode=Mode.SUBTRACT)

    # Esquisse18 → Enlèv. mat.-Extru.10 (cut)
    with BuildSketch(Plane(origin=(0, 12, 0), x_dir=(1, 0, 0), z_dir=(0, 1, 0))):
        with Locations((37.5, -57.667077727)):
            Rectangle(ESQUISSE18_W, ESQUISSE18_H)
        with Locations((-37.5, -57.667077727)):
            Rectangle(ESQUISSE18_W, ESQUISSE18_H)
        Polygon((-65.113526329, 0.354219591), (-70.363526329, -8.739047149), (-72.268782217, -7.639047149), (-67.018782217, 1.454219591), align=None)
        Polygon((-32.863526329, 56.212858135), (-34.768782217, 57.312858135), (-29.518782217, 66.406124875), (-27.613526329, 65.306124875), align=None)
        Polygon((32.863526329, 56.212858135), (27.613526329, 65.306124875), (29.518782217, 66.406124875), (34.768782217, 57.312858135), align=None)
        Polygon((65.113526329, 0.354219591), (67.018782217, 1.454219591), (72.268782217, -7.639047149), (70.363526329, -8.739047149), align=None)
    extrude(amount=-ENL_V_MAT_EXTRU_10_DEPTH, mode=Mode.SUBTRACT)


solid = part_3.part
